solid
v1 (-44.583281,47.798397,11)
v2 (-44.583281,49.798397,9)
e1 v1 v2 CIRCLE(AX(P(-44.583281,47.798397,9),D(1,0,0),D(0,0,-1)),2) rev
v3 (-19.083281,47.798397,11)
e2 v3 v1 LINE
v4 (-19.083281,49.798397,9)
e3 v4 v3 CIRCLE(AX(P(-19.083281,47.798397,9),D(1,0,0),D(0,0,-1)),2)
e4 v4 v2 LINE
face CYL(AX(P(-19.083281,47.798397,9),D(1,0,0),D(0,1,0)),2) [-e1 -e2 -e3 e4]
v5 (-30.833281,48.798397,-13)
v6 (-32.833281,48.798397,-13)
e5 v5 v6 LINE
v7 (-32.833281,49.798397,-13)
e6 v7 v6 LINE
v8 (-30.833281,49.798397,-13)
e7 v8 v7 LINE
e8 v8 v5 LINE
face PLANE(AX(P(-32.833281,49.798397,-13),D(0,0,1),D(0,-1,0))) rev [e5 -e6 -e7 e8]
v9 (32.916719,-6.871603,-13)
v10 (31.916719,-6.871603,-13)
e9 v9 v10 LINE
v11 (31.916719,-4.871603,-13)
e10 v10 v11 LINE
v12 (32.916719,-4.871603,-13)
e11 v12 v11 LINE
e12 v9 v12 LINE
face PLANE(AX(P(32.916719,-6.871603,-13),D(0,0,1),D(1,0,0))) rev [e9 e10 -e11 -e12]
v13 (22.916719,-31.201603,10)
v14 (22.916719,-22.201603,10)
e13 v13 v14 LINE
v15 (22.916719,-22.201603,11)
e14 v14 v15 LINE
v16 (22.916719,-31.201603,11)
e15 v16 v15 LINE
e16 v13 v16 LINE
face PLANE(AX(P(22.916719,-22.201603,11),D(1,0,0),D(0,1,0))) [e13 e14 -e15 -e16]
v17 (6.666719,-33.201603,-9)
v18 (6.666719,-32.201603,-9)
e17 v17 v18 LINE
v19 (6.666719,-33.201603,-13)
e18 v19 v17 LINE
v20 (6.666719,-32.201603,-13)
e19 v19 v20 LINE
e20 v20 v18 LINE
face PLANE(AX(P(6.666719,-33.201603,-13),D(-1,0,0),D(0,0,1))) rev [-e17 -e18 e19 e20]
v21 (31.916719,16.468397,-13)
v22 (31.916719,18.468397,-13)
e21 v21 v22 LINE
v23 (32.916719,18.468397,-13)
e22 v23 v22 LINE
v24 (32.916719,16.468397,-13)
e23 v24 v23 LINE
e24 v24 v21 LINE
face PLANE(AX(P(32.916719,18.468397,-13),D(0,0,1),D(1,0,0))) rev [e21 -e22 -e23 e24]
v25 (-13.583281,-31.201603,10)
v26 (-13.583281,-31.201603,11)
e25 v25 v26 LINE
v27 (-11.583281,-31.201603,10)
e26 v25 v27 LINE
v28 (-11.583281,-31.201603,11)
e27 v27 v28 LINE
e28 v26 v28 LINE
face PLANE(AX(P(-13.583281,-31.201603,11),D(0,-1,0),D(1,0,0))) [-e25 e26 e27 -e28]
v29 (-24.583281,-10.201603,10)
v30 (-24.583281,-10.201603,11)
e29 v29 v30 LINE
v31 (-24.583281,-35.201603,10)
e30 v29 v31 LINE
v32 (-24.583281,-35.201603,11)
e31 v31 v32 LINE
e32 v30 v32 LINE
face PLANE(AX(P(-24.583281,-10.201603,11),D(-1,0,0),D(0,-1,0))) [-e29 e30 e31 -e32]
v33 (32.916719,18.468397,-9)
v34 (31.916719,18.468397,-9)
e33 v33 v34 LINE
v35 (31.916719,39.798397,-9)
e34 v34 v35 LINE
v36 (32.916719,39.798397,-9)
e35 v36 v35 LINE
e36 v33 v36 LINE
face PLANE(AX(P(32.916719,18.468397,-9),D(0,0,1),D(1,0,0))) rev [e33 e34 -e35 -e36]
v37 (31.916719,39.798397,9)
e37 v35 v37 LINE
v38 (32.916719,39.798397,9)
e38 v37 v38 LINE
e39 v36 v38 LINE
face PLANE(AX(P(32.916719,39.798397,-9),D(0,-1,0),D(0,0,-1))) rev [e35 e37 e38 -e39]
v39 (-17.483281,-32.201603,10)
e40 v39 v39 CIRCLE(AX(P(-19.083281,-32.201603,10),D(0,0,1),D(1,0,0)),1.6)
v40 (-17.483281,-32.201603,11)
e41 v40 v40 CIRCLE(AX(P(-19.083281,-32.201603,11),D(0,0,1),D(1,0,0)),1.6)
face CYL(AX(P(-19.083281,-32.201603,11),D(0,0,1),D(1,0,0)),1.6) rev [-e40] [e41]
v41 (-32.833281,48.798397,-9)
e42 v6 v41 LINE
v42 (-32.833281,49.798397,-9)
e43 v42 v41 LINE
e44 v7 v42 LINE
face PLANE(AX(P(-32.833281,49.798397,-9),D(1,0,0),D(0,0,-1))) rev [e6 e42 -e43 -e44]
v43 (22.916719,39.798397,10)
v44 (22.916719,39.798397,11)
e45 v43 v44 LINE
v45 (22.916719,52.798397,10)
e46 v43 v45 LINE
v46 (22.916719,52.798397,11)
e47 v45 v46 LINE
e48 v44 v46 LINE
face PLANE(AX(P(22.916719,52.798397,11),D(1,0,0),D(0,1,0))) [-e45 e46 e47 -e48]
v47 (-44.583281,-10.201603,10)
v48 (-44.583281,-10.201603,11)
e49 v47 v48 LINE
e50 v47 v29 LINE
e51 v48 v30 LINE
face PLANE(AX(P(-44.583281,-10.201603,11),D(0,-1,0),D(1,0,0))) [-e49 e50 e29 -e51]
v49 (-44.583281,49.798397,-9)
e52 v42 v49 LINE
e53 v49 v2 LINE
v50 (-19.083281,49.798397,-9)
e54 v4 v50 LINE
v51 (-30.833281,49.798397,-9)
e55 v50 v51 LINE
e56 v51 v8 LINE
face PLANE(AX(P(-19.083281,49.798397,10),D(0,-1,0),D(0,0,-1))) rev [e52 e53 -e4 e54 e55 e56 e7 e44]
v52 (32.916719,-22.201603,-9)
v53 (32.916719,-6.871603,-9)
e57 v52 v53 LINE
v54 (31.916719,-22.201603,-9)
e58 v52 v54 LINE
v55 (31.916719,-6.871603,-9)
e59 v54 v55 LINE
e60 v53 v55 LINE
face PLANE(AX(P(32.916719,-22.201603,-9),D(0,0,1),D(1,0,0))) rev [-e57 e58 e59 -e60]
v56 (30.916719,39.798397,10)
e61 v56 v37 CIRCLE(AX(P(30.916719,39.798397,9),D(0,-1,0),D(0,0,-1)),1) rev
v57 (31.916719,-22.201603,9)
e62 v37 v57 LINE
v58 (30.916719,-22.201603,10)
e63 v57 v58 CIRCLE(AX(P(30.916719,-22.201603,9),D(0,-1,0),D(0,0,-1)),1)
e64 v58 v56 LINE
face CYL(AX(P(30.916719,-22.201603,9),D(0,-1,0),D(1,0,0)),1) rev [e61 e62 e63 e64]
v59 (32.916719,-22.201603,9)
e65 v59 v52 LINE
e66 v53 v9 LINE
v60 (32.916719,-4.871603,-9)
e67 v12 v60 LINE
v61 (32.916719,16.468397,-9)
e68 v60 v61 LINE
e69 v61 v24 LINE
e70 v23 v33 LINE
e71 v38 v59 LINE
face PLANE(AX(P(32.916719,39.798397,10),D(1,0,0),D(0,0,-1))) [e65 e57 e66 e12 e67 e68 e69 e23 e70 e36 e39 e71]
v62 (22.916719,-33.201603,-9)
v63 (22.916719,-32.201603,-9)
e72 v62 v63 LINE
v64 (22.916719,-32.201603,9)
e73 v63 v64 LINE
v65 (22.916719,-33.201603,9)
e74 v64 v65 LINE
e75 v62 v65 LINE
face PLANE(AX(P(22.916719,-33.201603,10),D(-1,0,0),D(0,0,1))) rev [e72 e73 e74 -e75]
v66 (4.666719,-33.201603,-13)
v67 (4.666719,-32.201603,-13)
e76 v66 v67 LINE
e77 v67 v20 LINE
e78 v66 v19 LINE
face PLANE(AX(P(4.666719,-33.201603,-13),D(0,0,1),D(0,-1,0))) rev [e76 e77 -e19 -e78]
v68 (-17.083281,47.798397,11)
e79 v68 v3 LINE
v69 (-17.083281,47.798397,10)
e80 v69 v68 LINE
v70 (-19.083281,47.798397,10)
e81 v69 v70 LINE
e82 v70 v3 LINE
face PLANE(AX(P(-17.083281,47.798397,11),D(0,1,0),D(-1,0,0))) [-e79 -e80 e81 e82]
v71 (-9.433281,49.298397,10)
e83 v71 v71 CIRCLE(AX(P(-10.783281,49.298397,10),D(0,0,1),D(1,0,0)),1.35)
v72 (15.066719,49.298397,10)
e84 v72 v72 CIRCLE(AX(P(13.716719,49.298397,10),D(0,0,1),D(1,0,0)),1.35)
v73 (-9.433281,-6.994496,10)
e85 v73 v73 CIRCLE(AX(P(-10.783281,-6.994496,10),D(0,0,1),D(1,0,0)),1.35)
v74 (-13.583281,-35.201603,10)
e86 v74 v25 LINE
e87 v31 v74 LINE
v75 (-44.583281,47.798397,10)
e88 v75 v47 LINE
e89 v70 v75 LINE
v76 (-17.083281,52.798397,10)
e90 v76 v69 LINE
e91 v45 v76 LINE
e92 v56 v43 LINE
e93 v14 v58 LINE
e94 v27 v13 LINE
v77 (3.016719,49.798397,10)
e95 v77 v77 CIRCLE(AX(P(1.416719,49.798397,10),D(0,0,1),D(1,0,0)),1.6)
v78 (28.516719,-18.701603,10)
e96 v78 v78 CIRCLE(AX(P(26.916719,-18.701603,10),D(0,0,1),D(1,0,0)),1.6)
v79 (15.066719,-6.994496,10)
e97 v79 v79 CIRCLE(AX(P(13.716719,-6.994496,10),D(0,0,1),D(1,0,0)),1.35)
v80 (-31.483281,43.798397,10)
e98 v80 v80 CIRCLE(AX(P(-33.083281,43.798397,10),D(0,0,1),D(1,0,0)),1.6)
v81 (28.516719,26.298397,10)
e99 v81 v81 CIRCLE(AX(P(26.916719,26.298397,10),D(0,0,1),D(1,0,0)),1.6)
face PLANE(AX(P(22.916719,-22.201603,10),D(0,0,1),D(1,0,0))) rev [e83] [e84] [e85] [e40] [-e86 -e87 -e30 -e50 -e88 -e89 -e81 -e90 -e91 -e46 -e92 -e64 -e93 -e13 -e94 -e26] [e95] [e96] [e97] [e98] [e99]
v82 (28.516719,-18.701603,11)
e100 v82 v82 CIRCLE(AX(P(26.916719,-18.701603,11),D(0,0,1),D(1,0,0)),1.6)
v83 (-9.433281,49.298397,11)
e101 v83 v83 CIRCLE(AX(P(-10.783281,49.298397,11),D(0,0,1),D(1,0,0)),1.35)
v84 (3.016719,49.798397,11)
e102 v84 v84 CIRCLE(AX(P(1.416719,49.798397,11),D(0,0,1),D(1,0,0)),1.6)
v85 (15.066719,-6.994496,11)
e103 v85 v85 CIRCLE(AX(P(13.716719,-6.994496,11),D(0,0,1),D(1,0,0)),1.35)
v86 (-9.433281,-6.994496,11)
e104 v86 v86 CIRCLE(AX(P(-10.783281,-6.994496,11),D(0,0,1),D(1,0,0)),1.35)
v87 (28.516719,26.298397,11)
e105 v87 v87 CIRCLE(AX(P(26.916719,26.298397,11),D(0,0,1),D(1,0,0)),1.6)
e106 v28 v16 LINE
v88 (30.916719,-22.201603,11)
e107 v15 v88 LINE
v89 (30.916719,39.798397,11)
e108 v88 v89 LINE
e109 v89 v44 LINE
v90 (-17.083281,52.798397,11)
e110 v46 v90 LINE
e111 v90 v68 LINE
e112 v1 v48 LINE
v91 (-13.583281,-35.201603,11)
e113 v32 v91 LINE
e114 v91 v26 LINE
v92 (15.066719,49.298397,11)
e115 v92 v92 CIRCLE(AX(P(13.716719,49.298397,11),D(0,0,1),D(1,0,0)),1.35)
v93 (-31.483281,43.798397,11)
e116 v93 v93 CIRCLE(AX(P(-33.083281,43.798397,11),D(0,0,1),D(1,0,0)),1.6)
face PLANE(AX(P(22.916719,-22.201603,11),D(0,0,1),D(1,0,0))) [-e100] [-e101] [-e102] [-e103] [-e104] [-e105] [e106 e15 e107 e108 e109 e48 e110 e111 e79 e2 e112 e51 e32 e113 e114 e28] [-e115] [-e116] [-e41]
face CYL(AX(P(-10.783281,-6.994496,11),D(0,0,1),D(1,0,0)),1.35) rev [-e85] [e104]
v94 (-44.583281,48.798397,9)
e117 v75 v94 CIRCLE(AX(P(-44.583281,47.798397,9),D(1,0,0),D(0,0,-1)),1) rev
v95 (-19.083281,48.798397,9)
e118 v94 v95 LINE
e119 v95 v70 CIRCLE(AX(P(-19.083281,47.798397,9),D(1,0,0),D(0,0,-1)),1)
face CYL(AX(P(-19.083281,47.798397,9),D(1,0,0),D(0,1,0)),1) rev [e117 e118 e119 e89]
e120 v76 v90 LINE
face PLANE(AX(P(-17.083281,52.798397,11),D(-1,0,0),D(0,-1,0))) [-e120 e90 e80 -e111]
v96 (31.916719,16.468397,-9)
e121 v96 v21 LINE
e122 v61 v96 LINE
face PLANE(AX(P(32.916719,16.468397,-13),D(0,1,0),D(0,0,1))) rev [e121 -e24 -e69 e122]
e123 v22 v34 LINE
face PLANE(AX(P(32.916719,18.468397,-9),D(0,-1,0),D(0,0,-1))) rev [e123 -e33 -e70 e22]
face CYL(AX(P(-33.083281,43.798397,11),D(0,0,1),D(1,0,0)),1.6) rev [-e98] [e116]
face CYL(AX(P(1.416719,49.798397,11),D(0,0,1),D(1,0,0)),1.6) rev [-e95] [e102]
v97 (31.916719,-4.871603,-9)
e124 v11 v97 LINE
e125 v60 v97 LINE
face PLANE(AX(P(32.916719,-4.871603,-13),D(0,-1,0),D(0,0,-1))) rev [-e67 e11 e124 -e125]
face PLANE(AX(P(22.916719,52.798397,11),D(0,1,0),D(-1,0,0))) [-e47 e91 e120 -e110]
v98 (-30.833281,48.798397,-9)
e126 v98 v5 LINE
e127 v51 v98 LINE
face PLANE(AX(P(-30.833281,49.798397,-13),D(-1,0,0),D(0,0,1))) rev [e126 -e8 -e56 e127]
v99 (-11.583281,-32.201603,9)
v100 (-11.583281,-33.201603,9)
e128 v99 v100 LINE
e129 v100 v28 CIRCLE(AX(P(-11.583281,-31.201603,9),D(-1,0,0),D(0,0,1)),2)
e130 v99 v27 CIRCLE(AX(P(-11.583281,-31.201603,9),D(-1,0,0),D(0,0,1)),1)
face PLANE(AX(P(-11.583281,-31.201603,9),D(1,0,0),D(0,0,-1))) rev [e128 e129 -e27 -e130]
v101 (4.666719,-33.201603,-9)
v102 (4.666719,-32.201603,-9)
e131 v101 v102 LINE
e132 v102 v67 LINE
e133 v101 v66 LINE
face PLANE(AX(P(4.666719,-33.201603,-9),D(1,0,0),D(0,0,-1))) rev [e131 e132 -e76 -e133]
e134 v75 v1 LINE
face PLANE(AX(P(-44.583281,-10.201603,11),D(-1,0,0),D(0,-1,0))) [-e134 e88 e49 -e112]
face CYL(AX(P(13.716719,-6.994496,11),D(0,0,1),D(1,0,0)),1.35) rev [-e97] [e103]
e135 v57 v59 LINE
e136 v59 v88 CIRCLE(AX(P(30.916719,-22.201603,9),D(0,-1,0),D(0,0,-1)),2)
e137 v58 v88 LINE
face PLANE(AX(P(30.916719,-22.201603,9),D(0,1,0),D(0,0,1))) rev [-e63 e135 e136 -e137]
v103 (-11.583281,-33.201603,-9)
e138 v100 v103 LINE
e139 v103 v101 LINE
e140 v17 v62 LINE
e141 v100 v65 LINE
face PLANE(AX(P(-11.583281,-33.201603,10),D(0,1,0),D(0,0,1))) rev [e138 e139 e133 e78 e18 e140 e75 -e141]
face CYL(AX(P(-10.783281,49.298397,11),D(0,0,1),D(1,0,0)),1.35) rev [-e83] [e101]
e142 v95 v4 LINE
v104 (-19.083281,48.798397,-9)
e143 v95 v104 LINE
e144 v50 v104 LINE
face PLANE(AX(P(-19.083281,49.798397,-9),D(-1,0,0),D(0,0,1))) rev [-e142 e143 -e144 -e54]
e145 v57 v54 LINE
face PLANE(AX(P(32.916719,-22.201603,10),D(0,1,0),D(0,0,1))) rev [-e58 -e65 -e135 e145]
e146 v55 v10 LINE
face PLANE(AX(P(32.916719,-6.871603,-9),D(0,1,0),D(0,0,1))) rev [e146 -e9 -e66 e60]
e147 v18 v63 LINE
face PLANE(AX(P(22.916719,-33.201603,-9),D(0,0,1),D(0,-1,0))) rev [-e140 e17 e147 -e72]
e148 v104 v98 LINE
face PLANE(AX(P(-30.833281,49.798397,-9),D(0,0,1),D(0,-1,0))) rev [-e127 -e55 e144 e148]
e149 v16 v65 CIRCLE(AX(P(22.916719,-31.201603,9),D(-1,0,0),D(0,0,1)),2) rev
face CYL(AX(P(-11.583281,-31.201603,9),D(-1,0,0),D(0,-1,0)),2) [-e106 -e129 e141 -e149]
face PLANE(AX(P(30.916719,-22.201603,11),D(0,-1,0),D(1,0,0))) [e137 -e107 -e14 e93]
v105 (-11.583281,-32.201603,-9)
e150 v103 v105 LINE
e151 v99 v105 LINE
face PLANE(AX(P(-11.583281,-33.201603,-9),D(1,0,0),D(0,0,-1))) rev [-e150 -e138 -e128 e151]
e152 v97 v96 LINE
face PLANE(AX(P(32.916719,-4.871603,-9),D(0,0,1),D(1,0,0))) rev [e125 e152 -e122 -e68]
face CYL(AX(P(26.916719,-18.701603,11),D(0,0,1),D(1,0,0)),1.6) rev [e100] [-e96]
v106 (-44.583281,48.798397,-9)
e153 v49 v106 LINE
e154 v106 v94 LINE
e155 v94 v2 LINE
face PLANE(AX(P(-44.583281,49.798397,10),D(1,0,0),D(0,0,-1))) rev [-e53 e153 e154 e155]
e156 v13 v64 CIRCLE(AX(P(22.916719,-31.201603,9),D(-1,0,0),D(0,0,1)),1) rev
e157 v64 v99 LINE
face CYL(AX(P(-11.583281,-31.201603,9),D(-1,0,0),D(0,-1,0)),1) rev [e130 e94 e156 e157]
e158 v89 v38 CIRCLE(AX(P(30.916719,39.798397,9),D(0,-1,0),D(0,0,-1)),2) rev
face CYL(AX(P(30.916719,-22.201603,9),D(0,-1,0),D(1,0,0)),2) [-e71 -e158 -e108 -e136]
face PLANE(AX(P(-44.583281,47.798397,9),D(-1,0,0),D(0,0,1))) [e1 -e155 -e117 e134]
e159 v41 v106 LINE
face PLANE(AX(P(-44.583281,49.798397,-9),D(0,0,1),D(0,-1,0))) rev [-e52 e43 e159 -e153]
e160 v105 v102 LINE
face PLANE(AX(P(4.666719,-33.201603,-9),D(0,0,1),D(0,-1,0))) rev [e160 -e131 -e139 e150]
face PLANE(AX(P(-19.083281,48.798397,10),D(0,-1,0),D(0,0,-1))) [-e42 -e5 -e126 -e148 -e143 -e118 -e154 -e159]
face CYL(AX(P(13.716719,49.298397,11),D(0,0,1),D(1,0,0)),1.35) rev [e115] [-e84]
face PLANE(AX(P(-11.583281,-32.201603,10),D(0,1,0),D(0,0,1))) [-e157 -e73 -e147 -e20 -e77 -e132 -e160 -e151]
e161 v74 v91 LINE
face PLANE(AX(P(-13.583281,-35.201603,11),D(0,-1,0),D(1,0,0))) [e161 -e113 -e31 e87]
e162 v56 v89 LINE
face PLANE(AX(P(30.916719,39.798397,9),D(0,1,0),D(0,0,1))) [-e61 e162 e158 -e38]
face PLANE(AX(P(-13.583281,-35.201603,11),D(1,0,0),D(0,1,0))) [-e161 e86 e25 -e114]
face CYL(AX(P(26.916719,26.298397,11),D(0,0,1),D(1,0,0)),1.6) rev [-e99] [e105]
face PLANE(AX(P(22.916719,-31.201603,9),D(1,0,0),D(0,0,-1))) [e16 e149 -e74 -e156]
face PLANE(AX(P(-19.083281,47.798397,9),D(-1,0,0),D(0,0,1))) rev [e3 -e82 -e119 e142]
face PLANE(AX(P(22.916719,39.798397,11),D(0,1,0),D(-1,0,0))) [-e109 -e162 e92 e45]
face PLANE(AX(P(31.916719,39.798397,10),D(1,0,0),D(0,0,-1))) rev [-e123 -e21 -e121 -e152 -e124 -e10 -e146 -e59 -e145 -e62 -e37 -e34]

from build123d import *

# Parameters (mm, degrees)
BOSS_EXTRUDE2_DEPTH            = 1
F_3_2_3_2_DIAMETER_HOLE1_D     = 3.2
F_3_2_3_2_DIAMETER_HOLE1_DEPTH = 1.6
F_3_2_3_2_DIAMETER_HOLE1_TIP   = 0.96137699
F_2_7_2_7_DIAMETER_HOLE1_D     = 2.7
F_2_7_2_7_DIAMETER_HOLE1_DEPTH = 1.6
F_2_7_2_7_DIAMETER_HOLE1_TIP   = 0.811161836
EDGE_FLANGE1_DEPTH             = 62
EDGE_FLANGE1_START             = 1
EDGE_FLANGE1_FLAT_DEPTH        = 1
EDGE_FLANGE1_BEND_DEPTH        = 25.5
EDGE_FLANGE1_FLAT_2_DEPTH      = 1
EDGE_FLANGE1_BEND_2_DEPTH      = 34.5
EDGE_FLANGE1_FLAT_3_DEPTH      = 1


# Sheet-metal steps are written as plain solids
with BuildPart() as part:
    # Sketch1 → Boss-Extrude2 (new body)
    with BuildSketch(Plane.XY.offset(10)):
        Polygon((-44.583280636, -10.201603144), (-24.583280636, -10.201603144), (-24.583280636, -35.201603144), (-13.583280636, -35.201603144), (-13.583280636, -31.201603144), (22.916719364, -31.201603144), (22.916719364, -22.201603144), (30.916719364, -22.201603144), (30.916719364, 39.798396856), (22.916719364, 39.798396856), (22.916719364, 52.798396856), (-17.083280636, 52.798396856), (-17.083280636, 47.798396856), (-44.583280636, 47.798396856), align=None)
    extrude(amount=BOSS_EXTRUDE2_DEPTH)

    # Ø3.2 (3.2) Diameter Hole1
    with Locations(Plane.XY.offset(11)):
        with Locations((-33.083280636, 43.798396856), (26.916719364, 26.298396856), (26.916719364, -18.701603144), (1.416719364, 49.798396856), (-19.083280636, -32.201603144)):
            Hole(F_3_2_3_2_DIAMETER_HOLE1_D / 2, depth=F_3_2_3_2_DIAMETER_HOLE1_DEPTH)
            with Locations((0, 0, -(F_3_2_3_2_DIAMETER_HOLE1_DEPTH + F_3_2_3_2_DIAMETER_HOLE1_TIP / 2))):  # 118° drill point
                Cone(0, F_3_2_3_2_DIAMETER_HOLE1_D / 2, F_3_2_3_2_DIAMETER_HOLE1_TIP, mode=Mode.SUBTRACT)

    # Ø2.7 (2.7) Diameter Hole1
    with Locations(Plane.XY.offset(11)):
        with Locations((-10.783280636, -6.994496363), (13.716719364, -6.994496363), (-10.783280636, 49.298396856), (13.716719364, 49.298396856)):
            Hole(F_2_7_2_7_DIAMETER_HOLE1_D / 2, depth=F_2_7_2_7_DIAMETER_HOLE1_DEPTH)
            with Locations((0, 0, -(F_2_7_2_7_DIAMETER_HOLE1_DEPTH + F_2_7_2_7_DIAMETER_HOLE1_TIP / 2))):  # 118° drill point
                Cone(0, F_2_7_2_7_DIAMETER_HOLE1_D / 2, F_2_7_2_7_DIAMETER_HOLE1_TIP, mode=Mode.SUBTRACT)

    # Edge-Flange1 bend section (across the edge) → Edge-Flange1 (add)
    with BuildSketch(Plane(origin=(31.916719364, 39.798396856, 10), x_dir=(-1, 0, 0), z_dir=(0, -1, 0))):
        with BuildLine():
            Line((-1, 1), (0, 1))
            ThreePointArc((0, 1), (0.292893219, 0.292893219), (1, 0))
            Line((1, 0), (1, -1))
            ThreePointArc((1, -1), (-0.414213562, -0.414213562), (-1, 1))
        make_face()
    extrude(amount=EDGE_FLANGE1_DEPTH)

    # Edge-Flange1 profile (on flange) → Edge-Flange1 flat (add)
    with BuildSketch(Plane(origin=(31.916719364, 0, 10), x_dir=(0, -1, 0), z_dir=(1, 0, 0)).offset(EDGE_FLANGE1_START)):
        Polygon((-39.798396856, 1), (22.201603144, 1), (22.201603144, 19), (6.871603144, 19), (6.871603144, 23), (4.871603144, 23), (4.871603144, 19), (-16.468396856, 19), (-16.468396856, 23), (-18.468396856, 23), (-18.468396856, 19), (-39.798396856, 19), align=None)
    extrude(amount=-EDGE_FLANGE1_FLAT_DEPTH)

    # Edge-Flange1 bend section 2 (across the edge) → Edge-Flange1 bend (add)
    with BuildSketch(Plane(origin=(-44.583280636, 48.798396856, 10), x_dir=(0, -1, 0), z_dir=(1, 0, 0))):
        with BuildLine():
            Line((-1, 1), (0, 1))
            ThreePointArc((0, 1), (0.292893219, 0.292893219), (1, 0))
            Line((1, 0), (1, -1))
            ThreePointArc((1, -1), (-0.414213562, -0.414213562), (-1, 1))
        make_face()
    extrude(amount=EDGE_FLANGE1_BEND_DEPTH)

    # Edge-Flange1 profile 2 (on flange) → Edge-Flange1 flat 2 (add)
    with BuildSketch(Plane(origin=(0, 48.798396856, 10), x_dir=(1, 0, 0), z_dir=(0, 1, 0)).offset(EDGE_FLANGE1_START)):
        Polygon((-19.083280636, 1), (-19.083280636, 19), (-30.833280636, 19), (-30.833280636, 23), (-32.833280636, 23), (-32.833280636, 19), (-44.583280636, 19), (-44.583280636, 1), align=None)
    extrude(amount=-EDGE_FLANGE1_FLAT_2_DEPTH)

    # Edge-Flange1 bend section 3 (across the edge) → Edge-Flange1 bend 2 (add)
    with BuildSketch(Plane(origin=(22.916719364, -32.201603144, 10), x_dir=(0, 1, 0), z_dir=(-1, 0, 0))):
        with BuildLine():
            Line((-1, 1), (0, 1))
            ThreePointArc((0, 1), (0.292893219, 0.292893219), (1, 0))
            Line((1, 0), (1, -1))
            ThreePointArc((1, -1), (-0.414213562, -0.414213562), (-1, 1))
        make_face()
    extrude(amount=EDGE_FLANGE1_BEND_2_DEPTH)

    # Edge-Flange1 profile 3 (on flange) → Edge-Flange1 flat 3 (add)
    with BuildSketch(Plane(origin=(0, -32.201603144, 10), x_dir=(-1, 0, 0), z_dir=(0, -1, 0)).offset(EDGE_FLANGE1_START)):
        Polygon((11.583280636, 1), (11.583280636, 19), (-4.666719364, 19), (-4.666719364, 23), (-6.666719364, 23), (-6.666719364, 19), (-22.916719364, 19), (-22.916719364, 1), align=None)
    extrude(amount=-EDGE_FLANGE1_FLAT_3_DEPTH)


solid = part.part
